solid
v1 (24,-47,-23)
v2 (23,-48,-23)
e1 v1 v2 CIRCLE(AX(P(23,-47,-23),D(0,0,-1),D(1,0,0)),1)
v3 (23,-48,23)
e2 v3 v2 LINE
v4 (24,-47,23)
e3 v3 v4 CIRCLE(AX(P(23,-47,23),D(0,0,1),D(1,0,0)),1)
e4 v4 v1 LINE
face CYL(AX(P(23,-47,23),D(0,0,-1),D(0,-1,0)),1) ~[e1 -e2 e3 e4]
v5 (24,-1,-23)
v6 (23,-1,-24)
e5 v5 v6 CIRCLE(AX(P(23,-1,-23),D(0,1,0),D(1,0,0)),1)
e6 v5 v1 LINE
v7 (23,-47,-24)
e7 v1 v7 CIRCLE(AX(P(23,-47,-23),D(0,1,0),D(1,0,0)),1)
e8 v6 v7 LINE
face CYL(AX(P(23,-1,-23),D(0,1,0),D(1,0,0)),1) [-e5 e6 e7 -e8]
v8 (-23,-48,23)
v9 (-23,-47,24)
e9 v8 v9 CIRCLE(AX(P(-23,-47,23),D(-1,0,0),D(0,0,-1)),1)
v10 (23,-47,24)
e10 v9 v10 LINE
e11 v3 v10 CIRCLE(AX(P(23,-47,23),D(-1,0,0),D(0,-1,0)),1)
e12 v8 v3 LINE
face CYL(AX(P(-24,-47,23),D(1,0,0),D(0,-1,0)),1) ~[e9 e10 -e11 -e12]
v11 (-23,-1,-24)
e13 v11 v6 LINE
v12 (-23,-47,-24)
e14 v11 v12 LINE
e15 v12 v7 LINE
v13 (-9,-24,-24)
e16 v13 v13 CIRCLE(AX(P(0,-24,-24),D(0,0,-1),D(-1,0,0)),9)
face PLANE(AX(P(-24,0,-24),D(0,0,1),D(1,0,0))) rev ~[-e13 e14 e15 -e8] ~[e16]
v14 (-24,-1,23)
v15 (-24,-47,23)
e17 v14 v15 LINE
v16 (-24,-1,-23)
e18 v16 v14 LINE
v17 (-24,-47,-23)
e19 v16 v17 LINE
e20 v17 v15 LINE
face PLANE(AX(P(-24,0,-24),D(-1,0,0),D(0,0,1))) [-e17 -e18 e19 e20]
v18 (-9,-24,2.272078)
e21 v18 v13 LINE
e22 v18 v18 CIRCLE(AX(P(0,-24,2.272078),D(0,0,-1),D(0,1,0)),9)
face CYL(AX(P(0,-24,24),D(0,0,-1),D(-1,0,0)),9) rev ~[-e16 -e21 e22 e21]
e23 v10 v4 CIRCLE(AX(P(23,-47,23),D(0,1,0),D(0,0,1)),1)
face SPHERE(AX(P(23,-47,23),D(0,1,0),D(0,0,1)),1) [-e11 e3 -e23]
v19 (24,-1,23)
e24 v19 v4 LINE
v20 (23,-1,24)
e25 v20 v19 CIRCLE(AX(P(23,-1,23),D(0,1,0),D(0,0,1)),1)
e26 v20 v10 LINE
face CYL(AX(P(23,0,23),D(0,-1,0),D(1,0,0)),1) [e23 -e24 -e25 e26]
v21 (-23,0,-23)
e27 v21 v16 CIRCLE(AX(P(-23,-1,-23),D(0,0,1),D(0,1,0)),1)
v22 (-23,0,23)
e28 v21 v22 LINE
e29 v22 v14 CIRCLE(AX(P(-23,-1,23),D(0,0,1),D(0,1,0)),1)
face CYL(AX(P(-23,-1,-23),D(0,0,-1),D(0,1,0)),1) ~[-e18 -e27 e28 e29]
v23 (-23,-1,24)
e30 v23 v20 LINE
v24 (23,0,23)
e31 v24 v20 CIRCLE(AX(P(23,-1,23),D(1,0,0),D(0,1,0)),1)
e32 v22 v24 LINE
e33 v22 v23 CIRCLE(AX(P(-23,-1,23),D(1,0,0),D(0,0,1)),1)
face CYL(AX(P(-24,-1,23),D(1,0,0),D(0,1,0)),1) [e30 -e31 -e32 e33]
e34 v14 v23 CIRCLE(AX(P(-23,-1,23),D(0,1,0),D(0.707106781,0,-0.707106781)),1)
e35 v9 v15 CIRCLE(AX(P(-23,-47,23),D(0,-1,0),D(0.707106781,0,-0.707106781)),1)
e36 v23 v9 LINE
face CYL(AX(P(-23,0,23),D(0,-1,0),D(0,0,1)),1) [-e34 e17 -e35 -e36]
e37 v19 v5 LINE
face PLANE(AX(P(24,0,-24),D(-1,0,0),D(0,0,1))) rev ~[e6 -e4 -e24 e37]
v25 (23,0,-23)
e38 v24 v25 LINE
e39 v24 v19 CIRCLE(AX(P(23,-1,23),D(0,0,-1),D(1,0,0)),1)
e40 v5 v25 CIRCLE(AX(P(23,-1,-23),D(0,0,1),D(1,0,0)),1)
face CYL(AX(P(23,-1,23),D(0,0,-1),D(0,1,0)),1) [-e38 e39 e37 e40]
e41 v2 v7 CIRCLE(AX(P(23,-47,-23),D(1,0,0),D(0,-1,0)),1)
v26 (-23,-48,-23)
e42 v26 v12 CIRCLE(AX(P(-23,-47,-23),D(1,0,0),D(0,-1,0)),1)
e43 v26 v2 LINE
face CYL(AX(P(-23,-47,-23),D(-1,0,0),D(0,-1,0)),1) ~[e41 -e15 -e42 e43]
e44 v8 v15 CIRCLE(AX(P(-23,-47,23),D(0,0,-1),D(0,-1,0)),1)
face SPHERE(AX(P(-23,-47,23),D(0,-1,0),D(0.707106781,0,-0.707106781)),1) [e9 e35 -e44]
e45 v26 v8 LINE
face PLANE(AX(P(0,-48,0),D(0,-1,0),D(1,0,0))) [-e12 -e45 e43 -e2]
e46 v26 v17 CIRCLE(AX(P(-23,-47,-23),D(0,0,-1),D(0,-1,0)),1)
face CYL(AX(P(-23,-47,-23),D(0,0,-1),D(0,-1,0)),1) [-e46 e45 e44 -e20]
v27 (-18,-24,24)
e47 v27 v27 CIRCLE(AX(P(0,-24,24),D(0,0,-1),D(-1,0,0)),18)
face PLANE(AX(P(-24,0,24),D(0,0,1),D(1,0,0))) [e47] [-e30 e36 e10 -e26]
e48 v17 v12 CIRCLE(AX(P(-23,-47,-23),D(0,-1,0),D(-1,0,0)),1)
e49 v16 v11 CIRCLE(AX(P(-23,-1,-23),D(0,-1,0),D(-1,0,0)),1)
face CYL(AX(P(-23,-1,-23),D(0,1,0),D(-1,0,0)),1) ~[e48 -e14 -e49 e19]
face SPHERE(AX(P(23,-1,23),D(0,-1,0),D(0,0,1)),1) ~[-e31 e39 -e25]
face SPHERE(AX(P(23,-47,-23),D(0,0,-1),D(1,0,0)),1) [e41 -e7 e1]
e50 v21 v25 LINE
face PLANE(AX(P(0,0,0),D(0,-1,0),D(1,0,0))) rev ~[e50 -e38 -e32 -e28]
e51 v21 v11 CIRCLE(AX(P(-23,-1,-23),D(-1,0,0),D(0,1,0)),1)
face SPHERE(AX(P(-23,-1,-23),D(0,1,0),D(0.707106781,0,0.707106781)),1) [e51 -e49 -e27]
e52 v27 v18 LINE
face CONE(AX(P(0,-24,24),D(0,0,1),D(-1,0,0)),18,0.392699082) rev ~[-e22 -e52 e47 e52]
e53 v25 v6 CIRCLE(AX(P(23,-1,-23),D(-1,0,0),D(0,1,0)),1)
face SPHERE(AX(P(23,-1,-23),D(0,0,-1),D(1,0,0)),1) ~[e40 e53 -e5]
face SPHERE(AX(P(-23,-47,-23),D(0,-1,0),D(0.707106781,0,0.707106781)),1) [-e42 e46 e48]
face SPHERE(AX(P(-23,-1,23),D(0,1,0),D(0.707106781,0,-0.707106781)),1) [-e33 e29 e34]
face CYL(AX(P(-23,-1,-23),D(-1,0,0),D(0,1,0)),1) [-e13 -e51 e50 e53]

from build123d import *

# Parameters (mm, degrees)
F0_W           = 48
F0_H           = 48
F1_DEPTH       = 48
F2_R           = 1
F3_R           = 1
F4_T1_DEPTH    = 46
F4_T3_DEPTH    = 46
F4_T5_DEPTH    = 46
F4_S9_W        = 1
F4_S9_H        = 1
F4_T10_DEPTH   = 1
F4_S15_W       = 1
F4_S15_H       = 1
F4_T16_DEPTH   = 1
F4_S21_W       = 1
F4_S21_H       = 1
F4_T22_DEPTH   = 1
F4_S27_W       = 1
F4_S27_H       = 1
F4_T28_DEPTH   = 1
F4_T32_ANGLE   = 90
F4_T34_ANGLE   = 90
F6_D           = 18
F6_CSINK_D     = 36
F6_CSINK_ANGLE = 45


# Not quite as in the source:
# - a fillet or chamfer that OpenCascade refuses, or shapes differently, is made with other operations: its cross-section is extruded or revolved along the edge and cut away or added


with BuildPart() as f1:
    # F0 (on Front) → F1 (new body)
    with BuildSketch(Plane.XZ):
        Rectangle(F0_W, F0_H)
    extrude(amount=F1_DEPTH)

    # F2
    f2_edges = [f1.edges().sort_by_distance(p)[0] for p in [
        (24, -24, 24),
    ]]
    fillet(f2_edges, radius=F2_R)

    # F3
    f3_edges = [f1.edges().sort_by_distance(p)[0] for p in [
        (-24, -24, 24),
        (-0.5, 0, 24),
        (-0.5, -48, 24),
    ]]
    fillet(f3_edges, radius=F3_R)

    # F4: fillet of radius 1 on 8 edges, made by hand

    # F4_s2 → F4_t1 (cut)
    with BuildSketch(Plane.XY.offset(-23)):
        with BuildLine():
            ThreePointArc((-23, -48), (-23.7071067812, -47.7071067812), (-24, -47))
            Line((-24, -47), (-24, -48))
            Line((-24, -48), (-23, -48))
        make_face()
        with BuildLine():
            ThreePointArc((-23, 0), (-23.7071067812, -0.2928932188), (-24, -1))
            Line((-24, -1), (-24, 0))
            Line((-24, 0), (-23, 0))
        make_face()
    extrude(amount=F4_T1_DEPTH, mode=Mode.SUBTRACT)

    # F4_s4 → F4_t3 (cut)
    with BuildSketch(Plane.YZ.offset(-23)):
        with BuildLine():
            ThreePointArc((0, -23), (-0.2928932188, -23.7071067812), (-1, -24))
            Line((-1, -24), (0, -24))
            Line((0, -24), (0, -23))
        make_face()
        with BuildLine():
            ThreePointArc((-48, -23), (-47.7071067812, -23.7071067812), (-47, -24))
            Line((-47, -24), (-48, -24))
            Line((-48, -24), (-48, -23))
        make_face()
    extrude(amount=F4_T3_DEPTH, mode=Mode.SUBTRACT)

    # F4_s6 → F4_t5 (cut)
    with BuildSketch(Plane.XZ.offset(1)):
        with BuildLine():
            ThreePointArc((-24, -23), (-23.7071067812, -23.7071067812), (-23, -24))
            Line((-23, -24), (-24, -24))
            Line((-24, -24), (-24, -23))
        make_face()
        with BuildLine():
            ThreePointArc((24, -23), (23.7071067812, -23.7071067812), (23, -24))
            Line((23, -24), (24, -24))
            Line((24, -24), (24, -23))
        make_face()
    extrude(amount=F4_T5_DEPTH, mode=Mode.SUBTRACT)


with BuildPart() as f4_tool8:
    # F4_s9 → F4_t10 (new body)
    with BuildSketch(Plane.XZ.offset(1)):
        with Locations((-23.5, 23.5)):
            Rectangle(F4_S9_W, F4_S9_H)
    extrude(amount=-F4_T10_DEPTH)

    # F4_s11 → F4_t12 (revolve, cut)
    with BuildSketch(Plane(origin=(-23, -1, 23), x_dir=(0.7071067812, 0, -0.7071067812), z_dir=(0.7071067812, 0, 0.7071067812))):
        with BuildLine():
            ThreePointArc((0, -1), (1, 0), (0, 1))
            Line((0, 1), (0, -1))
        make_face()
    revolve(axis=Axis((-23, -1, 23), (0, 1, 0)), mode=Mode.SUBTRACT)


with BuildPart() as f1_1:
    add(f1.part)

    # F4_t7: cut F4_tool8
    add(f4_tool8.part, mode=Mode.SUBTRACT)


with BuildPart() as f4_tool14:
    # F4_s15 → F4_t16 (new body)
    with BuildSketch(Plane.XZ.offset(47)):
        with Locations((-23.5, 23.5)):
            Rectangle(F4_S15_W, F4_S15_H)
    extrude(amount=F4_T16_DEPTH)

    # F4_s17 → F4_t18 (revolve, cut)
    with BuildSketch(Plane(origin=(-23, -47, 23), x_dir=(0.7071067812, 0, -0.7071067812), z_dir=(-0.7071067812, 0, -0.7071067812))):
        with BuildLine():
            ThreePointArc((0, -1), (1, 0), (0, 1))
            Line((0, 1), (0, -1))
        make_face()
    revolve(axis=Axis((-23, -47, 23), (0, -1, 0)), mode=Mode.SUBTRACT)


with BuildPart() as f1_2:
    add(f1_1.part)

    # F4_t13: cut F4_tool14
    add(f4_tool14.part, mode=Mode.SUBTRACT)


with BuildPart() as f4_tool20:
    # F4_s21 → F4_t22 (new body)
    with BuildSketch(Plane.XZ.offset(47)):
        with Locations((-23.5, -23.5)):
            Rectangle(F4_S21_W, F4_S21_H)
    extrude(amount=F4_T22_DEPTH)

    # F4_s23 → F4_t24 (revolve, cut)
    with BuildSketch(Plane(origin=(-23, -47, -23), x_dir=(0.7071067812, 0, 0.7071067812), z_dir=(0.7071067812, 0, -0.7071067812))):
        with BuildLine():
            ThreePointArc((0, -1), (1, 0), (0, 1))
            Line((0, 1), (0, -1))
        make_face()
    revolve(axis=Axis((-23, -47, -23), (0, -1, 0)), mode=Mode.SUBTRACT)


with BuildPart() as f1_3:
    add(f1_2.part)

    # F4_t19: cut F4_tool20
    add(f4_tool20.part, mode=Mode.SUBTRACT)


with BuildPart() as f4_tool26:
    # F4_s27 → F4_t28 (new body)
    with BuildSketch(Plane.XZ.offset(1)):
        with Locations((-23.5, -23.5)):
            Rectangle(F4_S27_W, F4_S27_H)
    extrude(amount=-F4_T28_DEPTH)

    # F4_s29 → F4_t30 (revolve, cut)
    with BuildSketch(Plane(origin=(-23, -1, -23), x_dir=(0.7071067812, 0, 0.7071067812), z_dir=(-0.7071067812, 0, 0.7071067812))):
        with BuildLine():
            ThreePointArc((0, -1), (1, 0), (0, 1))
            Line((0, 1), (0, -1))
        make_face()
    revolve(axis=Axis((-23, -1, -23), (0, 1, 0)), mode=Mode.SUBTRACT)


with BuildPart() as f1_4:
    add(f1_3.part)

    # F4_t25: cut F4_tool26
    add(f4_tool26.part, mode=Mode.SUBTRACT)

    # F4_s31 → F4_t32 (revolve, cut)
    with BuildSketch(Plane.XZ.offset(1)):
        with BuildLine():
            ThreePointArc((24, -23), (23.7071067812, -23.7071067812), (23, -24))
            Line((23, -24), (24, -24))
            Line((24, -24), (24, -23))
        make_face()
    revolve(axis=Axis((23, -1, -24), (0, 0, 1)), revolution_arc=F4_T32_ANGLE, mode=Mode.SUBTRACT)

    # F4_s33 → F4_t34 (revolve, cut)
    with BuildSketch(Plane.XZ.offset(47)):
        with BuildLine():
            ThreePointArc((24, -23), (23.7071067812, -23.7071067812), (23, -24))
            Line((23, -24), (24, -24))
            Line((24, -24), (24, -23))
        make_face()
    revolve(axis=Axis((23, -47, -24), (0, 0, -1)), revolution_arc=F4_T34_ANGLE, mode=Mode.SUBTRACT)

    # F6 (through all)
    with Locations(Plane.XY.offset(24)):
        with Locations((0, -24)):
            CounterSinkHole(F6_D / 2, F6_CSINK_D / 2, counter_sink_angle=F6_CSINK_ANGLE)


solid = f1_4.part
